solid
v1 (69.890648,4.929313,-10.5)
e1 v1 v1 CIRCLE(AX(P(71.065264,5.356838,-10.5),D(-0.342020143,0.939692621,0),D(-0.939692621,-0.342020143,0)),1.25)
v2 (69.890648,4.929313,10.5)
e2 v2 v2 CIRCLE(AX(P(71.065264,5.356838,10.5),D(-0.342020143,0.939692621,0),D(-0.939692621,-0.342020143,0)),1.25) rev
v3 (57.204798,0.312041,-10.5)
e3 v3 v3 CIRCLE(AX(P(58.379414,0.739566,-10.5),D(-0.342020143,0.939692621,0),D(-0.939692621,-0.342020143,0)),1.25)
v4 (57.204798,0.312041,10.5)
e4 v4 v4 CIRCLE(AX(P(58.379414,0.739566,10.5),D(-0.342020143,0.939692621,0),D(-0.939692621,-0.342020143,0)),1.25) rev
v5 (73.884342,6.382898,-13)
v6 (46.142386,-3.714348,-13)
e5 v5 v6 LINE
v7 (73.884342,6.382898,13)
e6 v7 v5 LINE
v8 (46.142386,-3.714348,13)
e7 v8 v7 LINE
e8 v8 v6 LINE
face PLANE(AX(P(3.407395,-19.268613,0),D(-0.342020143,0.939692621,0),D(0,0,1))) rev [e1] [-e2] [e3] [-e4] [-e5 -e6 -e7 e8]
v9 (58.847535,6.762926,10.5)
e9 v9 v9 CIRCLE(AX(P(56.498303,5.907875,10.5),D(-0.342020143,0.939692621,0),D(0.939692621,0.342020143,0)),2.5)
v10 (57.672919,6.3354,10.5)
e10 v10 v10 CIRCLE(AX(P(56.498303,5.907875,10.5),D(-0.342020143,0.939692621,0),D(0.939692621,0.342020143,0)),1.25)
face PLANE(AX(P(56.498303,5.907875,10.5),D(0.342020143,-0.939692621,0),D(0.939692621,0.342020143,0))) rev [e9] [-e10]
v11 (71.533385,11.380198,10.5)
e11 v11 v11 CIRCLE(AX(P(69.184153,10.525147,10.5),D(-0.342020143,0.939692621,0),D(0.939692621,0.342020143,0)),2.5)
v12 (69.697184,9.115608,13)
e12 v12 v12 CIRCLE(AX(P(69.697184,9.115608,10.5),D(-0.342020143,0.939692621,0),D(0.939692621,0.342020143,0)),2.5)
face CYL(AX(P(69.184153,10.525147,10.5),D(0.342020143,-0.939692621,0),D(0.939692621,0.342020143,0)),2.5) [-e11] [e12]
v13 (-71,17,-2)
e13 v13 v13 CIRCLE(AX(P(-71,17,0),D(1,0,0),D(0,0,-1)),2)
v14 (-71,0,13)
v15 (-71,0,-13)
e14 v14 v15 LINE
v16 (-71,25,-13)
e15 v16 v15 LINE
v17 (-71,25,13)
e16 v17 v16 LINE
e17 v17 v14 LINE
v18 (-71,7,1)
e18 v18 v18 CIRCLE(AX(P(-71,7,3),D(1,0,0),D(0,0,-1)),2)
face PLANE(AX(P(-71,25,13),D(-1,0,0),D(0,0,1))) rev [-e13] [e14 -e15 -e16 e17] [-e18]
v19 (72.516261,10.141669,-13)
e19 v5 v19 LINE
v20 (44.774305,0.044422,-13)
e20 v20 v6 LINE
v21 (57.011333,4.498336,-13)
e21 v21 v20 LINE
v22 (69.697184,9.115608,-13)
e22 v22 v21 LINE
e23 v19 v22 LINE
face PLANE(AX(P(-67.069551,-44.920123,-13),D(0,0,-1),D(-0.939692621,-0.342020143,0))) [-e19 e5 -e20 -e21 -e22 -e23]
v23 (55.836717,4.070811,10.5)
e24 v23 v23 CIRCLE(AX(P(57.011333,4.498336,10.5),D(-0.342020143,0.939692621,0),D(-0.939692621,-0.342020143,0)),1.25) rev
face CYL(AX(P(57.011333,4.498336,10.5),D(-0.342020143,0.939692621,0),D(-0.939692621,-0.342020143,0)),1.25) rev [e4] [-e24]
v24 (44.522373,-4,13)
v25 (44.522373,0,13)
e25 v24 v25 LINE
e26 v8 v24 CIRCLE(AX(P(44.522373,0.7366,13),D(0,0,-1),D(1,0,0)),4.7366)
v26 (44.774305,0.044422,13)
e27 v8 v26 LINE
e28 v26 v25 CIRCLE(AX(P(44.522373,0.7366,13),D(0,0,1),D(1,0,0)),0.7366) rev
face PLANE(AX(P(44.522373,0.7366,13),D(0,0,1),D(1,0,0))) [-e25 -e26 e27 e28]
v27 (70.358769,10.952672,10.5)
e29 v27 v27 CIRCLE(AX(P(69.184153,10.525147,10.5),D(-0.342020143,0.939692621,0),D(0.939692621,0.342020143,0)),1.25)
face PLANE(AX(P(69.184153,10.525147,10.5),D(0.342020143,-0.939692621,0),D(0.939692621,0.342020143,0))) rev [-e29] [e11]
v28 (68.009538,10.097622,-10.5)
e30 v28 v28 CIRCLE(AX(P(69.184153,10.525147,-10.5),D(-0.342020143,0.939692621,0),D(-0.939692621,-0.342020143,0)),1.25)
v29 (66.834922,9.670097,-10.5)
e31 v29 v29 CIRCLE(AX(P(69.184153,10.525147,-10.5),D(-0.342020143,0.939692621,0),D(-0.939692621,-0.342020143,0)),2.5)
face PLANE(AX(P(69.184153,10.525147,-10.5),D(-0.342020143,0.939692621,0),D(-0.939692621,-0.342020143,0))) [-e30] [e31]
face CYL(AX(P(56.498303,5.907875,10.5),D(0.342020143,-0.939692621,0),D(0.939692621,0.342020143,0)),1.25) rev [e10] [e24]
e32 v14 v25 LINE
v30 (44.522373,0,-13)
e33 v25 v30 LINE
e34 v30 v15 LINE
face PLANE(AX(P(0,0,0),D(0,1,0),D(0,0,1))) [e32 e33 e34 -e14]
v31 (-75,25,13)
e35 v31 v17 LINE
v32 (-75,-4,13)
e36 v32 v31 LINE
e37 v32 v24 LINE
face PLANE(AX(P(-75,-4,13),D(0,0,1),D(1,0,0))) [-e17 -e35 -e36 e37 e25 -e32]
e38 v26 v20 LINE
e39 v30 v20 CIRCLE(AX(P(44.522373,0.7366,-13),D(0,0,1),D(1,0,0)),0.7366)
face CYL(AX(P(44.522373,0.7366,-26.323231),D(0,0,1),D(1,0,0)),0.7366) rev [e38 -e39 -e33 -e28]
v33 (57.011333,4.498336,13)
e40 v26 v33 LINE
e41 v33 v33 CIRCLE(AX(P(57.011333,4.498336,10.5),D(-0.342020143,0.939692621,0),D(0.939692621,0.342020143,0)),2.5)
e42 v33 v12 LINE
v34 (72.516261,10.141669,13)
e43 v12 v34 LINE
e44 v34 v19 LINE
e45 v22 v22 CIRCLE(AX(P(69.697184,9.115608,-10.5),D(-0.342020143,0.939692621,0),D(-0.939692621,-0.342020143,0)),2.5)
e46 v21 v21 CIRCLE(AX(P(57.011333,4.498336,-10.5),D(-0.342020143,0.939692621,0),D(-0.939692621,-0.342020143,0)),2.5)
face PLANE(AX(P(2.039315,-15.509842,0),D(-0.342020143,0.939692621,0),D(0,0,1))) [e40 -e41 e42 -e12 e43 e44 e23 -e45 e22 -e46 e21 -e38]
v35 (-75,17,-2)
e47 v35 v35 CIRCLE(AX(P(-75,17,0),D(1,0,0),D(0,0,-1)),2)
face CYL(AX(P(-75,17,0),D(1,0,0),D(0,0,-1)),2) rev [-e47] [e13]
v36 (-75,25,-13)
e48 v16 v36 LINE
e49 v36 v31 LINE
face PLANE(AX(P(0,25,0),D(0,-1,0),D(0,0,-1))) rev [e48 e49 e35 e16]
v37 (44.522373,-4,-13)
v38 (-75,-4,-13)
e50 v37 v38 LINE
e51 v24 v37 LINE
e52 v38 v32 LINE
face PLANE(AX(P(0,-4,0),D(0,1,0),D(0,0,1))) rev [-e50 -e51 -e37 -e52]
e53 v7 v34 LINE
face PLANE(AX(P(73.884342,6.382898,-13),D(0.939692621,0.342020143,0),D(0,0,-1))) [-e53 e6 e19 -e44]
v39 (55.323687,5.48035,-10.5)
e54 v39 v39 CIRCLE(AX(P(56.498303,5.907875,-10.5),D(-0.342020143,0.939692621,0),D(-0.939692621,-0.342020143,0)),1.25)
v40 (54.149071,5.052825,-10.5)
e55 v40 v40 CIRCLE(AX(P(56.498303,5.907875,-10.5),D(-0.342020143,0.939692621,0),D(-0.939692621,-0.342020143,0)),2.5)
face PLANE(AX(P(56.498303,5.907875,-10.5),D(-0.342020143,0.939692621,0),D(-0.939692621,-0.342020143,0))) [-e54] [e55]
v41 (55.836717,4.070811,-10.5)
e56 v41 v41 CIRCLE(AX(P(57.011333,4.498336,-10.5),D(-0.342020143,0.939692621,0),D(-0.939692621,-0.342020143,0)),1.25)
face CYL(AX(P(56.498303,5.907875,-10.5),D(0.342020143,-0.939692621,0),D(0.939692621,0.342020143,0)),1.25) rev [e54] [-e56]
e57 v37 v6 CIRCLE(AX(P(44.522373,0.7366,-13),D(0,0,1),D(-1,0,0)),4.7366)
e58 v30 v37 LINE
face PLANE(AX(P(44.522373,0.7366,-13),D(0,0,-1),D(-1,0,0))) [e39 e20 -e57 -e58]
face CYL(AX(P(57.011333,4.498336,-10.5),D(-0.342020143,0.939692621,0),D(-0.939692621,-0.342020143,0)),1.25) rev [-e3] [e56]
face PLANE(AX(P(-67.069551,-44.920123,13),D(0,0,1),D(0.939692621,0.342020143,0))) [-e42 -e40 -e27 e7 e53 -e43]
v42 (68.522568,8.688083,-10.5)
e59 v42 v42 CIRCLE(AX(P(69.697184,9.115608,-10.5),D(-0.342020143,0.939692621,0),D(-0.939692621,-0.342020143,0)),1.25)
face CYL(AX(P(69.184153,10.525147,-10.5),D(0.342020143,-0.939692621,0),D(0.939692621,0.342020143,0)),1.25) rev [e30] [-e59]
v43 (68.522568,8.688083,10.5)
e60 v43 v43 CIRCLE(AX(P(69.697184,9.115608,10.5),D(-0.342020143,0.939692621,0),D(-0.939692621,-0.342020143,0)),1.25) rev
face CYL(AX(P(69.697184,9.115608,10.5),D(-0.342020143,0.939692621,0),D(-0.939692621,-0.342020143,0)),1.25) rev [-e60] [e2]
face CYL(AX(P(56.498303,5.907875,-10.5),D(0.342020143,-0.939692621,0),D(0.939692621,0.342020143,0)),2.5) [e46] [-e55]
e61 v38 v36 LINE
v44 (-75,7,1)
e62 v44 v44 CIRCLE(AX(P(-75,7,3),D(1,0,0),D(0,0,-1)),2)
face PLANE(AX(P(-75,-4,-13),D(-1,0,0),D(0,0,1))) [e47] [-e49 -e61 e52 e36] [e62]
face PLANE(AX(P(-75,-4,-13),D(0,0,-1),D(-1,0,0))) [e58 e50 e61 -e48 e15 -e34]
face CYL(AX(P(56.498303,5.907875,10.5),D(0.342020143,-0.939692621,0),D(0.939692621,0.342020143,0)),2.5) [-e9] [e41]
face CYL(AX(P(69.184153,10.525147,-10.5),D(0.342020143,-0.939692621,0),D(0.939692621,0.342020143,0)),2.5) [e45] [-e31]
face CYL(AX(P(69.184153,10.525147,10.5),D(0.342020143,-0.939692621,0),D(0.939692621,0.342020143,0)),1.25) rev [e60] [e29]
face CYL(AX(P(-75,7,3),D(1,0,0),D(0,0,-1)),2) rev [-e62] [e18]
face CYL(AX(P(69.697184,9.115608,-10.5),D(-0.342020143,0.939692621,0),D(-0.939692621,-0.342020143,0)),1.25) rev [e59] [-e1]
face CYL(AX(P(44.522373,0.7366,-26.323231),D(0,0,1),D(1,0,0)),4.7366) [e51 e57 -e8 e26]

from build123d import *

# Parameters (mm, degrees)
ESQUISSE2_W                 = 150
ESQUISSE2_H                 = 26
T_LE_DE_BASE_PLI_E1_DEPTH   = 4
PLI_START                   = -13
PLI_ESQUISS_1_DEPTH         = 26
PLI_ESQUISS_1_2_DEPTH       = 26
ESQUISSE9_R                 = 2.5
ESQUISSE9_R_2               = 1.25
BOSS_EXTRU_1_DEPTH          = 1.5
ENL_V_START                 = -4
ENL_V_MAT_EXTRU_1_OUTLINE_R = 1.25
ENL_V_MAT_EXTRU_1_DEPTH     = 4
ESQUISSE11_W                = 4
ESQUISSE11_H                = 26
BOSS_EXTRU_2_DEPTH          = 25
ESQUISSE12_R                = 2
ENL_V_MAT_EXTRU_5_DEPTH     = 148.599026321


# Read off the part's stored shape, not the designer's step: Pli esquissé1, Enlèv. mat.-Extru.1
# Sheet-metal steps are written as plain solids
with BuildPart() as part:
    # Esquisse2 → Tôle de base pliée1 (new body)
    with BuildSketch(Plane(origin=(0, 0, 0), x_dir=(1, 0, 0), z_dir=(0, 1, 0))):
        Rectangle(ESQUISSE2_W, ESQUISSE2_H)
    extrude(amount=-T_LE_DE_BASE_PLI_E1_DEPTH)

    # Pli esquissé1 outline → Pli esquissé1 (cut)
    with BuildSketch(Plane.XY.offset(PLI_START)):
        with BuildLine():
            Line((75, 0), (56.347473252, 0))
            Line((56.347473252, 0), (46.142385808, -3.714348068))
            ThreePointArc((46.142385808, -3.714348068), (45.344875155, -3.928040403), (44.522373197, -4))
            Line((44.522373197, -4), (75, -4))
            Line((75, -4), (75, 0))
        make_face()
    extrude(amount=PLI_ESQUISS_1_DEPTH, mode=Mode.SUBTRACT)

    # Pli esquiss_1 2 outline → Pli esquiss_1 2 (add)
    with BuildSketch(Plane.XY.offset(PLI_START)):
        with BuildLine():
            Line((56.347473252, 0), (73.884342049, 6.382898245))
            Line((73.884342049, 6.382898245), (72.516261476, 10.141668728))
            Line((72.516261476, 10.141668728), (44.774305234, 0.044422416))
            ThreePointArc((44.774305234, 0.044422416), (44.650282444, 0.011190609), (44.522373197, 0))
            Line((44.522373197, 0), (56.347473252, 0))
        make_face()
    extrude(amount=PLI_ESQUISS_1_2_DEPTH)

    # Esquisse9 → Boss.-Extru.1 (add)
    # profile 1 of 4: a face of its own
    with BuildSketch(Plane(origin=(5.223321668, -14.350958338, 0), x_dir=(0.9396926207859082, 0.34202014332566943, 0), z_dir=(-0.34202014332566943, 0.9396926207859082, 0))):
        with Locations(Location((55.111650787, 10.5, 0), (0, 0, 90))):
            Circle(ESQUISSE9_R)
        with Locations(Location((55.111650787, 10.5, 0), (0, 0, 180))):
            Circle(ESQUISSE9_R_2, mode=Mode.SUBTRACT)
    # profile 2 of 4: a face of its own
    with BuildSketch(Plane(origin=(5.223321668, -14.350958338, 0), x_dir=(0.9396926207859082, 0.34202014332566943, 0), z_dir=(-0.34202014332566943, 0.9396926207859082, 0))):
        with Locations(Location((68.611650787, 10.5, 0), (0, 0, 90))):
            Circle(ESQUISSE9_R)
        with Locations(Location((68.611650787, 10.5, 0), (0, 0, 180))):
            Circle(ESQUISSE9_R_2, mode=Mode.SUBTRACT)
    # profile 3 of 4: a face of its own
    with BuildSketch(Plane(origin=(5.223321668, -14.350958338, 0), x_dir=(0.9396926207859082, 0.34202014332566943, 0), z_dir=(-0.34202014332566943, 0.9396926207859082, 0))):
        with Locations((68.611650787, -10.5)):
            Circle(ESQUISSE9_R)
        with Locations((68.611650787, -10.5)):
            Circle(ESQUISSE9_R_2, mode=Mode.SUBTRACT)
    # profile 4 of 4: a face of its own
    with BuildSketch(Plane(origin=(5.223321668, -14.350958338, 0), x_dir=(0.9396926207859082, 0.34202014332566943, 0), z_dir=(-0.34202014332566943, 0.9396926207859082, 0))):
        with Locations((55.111650787, -10.5)):
            Circle(ESQUISSE9_R)
        with Locations((55.111650787, -10.5)):
            Circle(ESQUISSE9_R_2, mode=Mode.SUBTRACT)
    extrude(amount=BOSS_EXTRU_1_DEPTH)

    # Enlèv. mat.-Extru.1 outline → Enlèv. mat.-Extru.1 (cut)
    with BuildSketch(Plane(origin=(5.223321668, -14.350958338, 0), x_dir=(0.9396926207859082, 0.34202014332566943, 0), z_dir=(-0.34202014332566943, 0.9396926207859082, 0)).offset(ENL_V_START)):
        with Locations((68.611650787, 10.5)):
            Circle(ENL_V_MAT_EXTRU_1_OUTLINE_R)
        with Locations((68.611650787, -10.5)):
            Circle(ENL_V_MAT_EXTRU_1_OUTLINE_R)
        with Locations((55.111650787, 10.5)):
            Circle(ENL_V_MAT_EXTRU_1_OUTLINE_R)
        with Locations((55.111650787, -10.5)):
            Circle(ENL_V_MAT_EXTRU_1_OUTLINE_R)
    extrude(amount=ENL_V_MAT_EXTRU_1_DEPTH, mode=Mode.SUBTRACT)

    # Esquisse11 → Boss.-Extru.2 (add)
    with BuildSketch(Plane(origin=(0, 0, 0), x_dir=(1, 0, 0), z_dir=(0, 1, 0))):
        with Locations((-73, 0)):
            Rectangle(ESQUISSE11_W, ESQUISSE11_H)
    extrude(amount=BOSS_EXTRU_2_DEPTH)

    # Esquisse12 → Enlèv. mat.-Extru.5 (cut, through all)
    with BuildSketch(Plane(origin=(-71, 0, 0), x_dir=(0, 0, -1), z_dir=(1, 0, 0))):
        with Locations((-3, 7)):
            Circle(ESQUISSE12_R)
        with Locations((0, 17)):
            Circle(ESQUISSE12_R)
    extrude(amount=-ENL_V_MAT_EXTRU_5_DEPTH, mode=Mode.SUBTRACT)


solid = part.part
